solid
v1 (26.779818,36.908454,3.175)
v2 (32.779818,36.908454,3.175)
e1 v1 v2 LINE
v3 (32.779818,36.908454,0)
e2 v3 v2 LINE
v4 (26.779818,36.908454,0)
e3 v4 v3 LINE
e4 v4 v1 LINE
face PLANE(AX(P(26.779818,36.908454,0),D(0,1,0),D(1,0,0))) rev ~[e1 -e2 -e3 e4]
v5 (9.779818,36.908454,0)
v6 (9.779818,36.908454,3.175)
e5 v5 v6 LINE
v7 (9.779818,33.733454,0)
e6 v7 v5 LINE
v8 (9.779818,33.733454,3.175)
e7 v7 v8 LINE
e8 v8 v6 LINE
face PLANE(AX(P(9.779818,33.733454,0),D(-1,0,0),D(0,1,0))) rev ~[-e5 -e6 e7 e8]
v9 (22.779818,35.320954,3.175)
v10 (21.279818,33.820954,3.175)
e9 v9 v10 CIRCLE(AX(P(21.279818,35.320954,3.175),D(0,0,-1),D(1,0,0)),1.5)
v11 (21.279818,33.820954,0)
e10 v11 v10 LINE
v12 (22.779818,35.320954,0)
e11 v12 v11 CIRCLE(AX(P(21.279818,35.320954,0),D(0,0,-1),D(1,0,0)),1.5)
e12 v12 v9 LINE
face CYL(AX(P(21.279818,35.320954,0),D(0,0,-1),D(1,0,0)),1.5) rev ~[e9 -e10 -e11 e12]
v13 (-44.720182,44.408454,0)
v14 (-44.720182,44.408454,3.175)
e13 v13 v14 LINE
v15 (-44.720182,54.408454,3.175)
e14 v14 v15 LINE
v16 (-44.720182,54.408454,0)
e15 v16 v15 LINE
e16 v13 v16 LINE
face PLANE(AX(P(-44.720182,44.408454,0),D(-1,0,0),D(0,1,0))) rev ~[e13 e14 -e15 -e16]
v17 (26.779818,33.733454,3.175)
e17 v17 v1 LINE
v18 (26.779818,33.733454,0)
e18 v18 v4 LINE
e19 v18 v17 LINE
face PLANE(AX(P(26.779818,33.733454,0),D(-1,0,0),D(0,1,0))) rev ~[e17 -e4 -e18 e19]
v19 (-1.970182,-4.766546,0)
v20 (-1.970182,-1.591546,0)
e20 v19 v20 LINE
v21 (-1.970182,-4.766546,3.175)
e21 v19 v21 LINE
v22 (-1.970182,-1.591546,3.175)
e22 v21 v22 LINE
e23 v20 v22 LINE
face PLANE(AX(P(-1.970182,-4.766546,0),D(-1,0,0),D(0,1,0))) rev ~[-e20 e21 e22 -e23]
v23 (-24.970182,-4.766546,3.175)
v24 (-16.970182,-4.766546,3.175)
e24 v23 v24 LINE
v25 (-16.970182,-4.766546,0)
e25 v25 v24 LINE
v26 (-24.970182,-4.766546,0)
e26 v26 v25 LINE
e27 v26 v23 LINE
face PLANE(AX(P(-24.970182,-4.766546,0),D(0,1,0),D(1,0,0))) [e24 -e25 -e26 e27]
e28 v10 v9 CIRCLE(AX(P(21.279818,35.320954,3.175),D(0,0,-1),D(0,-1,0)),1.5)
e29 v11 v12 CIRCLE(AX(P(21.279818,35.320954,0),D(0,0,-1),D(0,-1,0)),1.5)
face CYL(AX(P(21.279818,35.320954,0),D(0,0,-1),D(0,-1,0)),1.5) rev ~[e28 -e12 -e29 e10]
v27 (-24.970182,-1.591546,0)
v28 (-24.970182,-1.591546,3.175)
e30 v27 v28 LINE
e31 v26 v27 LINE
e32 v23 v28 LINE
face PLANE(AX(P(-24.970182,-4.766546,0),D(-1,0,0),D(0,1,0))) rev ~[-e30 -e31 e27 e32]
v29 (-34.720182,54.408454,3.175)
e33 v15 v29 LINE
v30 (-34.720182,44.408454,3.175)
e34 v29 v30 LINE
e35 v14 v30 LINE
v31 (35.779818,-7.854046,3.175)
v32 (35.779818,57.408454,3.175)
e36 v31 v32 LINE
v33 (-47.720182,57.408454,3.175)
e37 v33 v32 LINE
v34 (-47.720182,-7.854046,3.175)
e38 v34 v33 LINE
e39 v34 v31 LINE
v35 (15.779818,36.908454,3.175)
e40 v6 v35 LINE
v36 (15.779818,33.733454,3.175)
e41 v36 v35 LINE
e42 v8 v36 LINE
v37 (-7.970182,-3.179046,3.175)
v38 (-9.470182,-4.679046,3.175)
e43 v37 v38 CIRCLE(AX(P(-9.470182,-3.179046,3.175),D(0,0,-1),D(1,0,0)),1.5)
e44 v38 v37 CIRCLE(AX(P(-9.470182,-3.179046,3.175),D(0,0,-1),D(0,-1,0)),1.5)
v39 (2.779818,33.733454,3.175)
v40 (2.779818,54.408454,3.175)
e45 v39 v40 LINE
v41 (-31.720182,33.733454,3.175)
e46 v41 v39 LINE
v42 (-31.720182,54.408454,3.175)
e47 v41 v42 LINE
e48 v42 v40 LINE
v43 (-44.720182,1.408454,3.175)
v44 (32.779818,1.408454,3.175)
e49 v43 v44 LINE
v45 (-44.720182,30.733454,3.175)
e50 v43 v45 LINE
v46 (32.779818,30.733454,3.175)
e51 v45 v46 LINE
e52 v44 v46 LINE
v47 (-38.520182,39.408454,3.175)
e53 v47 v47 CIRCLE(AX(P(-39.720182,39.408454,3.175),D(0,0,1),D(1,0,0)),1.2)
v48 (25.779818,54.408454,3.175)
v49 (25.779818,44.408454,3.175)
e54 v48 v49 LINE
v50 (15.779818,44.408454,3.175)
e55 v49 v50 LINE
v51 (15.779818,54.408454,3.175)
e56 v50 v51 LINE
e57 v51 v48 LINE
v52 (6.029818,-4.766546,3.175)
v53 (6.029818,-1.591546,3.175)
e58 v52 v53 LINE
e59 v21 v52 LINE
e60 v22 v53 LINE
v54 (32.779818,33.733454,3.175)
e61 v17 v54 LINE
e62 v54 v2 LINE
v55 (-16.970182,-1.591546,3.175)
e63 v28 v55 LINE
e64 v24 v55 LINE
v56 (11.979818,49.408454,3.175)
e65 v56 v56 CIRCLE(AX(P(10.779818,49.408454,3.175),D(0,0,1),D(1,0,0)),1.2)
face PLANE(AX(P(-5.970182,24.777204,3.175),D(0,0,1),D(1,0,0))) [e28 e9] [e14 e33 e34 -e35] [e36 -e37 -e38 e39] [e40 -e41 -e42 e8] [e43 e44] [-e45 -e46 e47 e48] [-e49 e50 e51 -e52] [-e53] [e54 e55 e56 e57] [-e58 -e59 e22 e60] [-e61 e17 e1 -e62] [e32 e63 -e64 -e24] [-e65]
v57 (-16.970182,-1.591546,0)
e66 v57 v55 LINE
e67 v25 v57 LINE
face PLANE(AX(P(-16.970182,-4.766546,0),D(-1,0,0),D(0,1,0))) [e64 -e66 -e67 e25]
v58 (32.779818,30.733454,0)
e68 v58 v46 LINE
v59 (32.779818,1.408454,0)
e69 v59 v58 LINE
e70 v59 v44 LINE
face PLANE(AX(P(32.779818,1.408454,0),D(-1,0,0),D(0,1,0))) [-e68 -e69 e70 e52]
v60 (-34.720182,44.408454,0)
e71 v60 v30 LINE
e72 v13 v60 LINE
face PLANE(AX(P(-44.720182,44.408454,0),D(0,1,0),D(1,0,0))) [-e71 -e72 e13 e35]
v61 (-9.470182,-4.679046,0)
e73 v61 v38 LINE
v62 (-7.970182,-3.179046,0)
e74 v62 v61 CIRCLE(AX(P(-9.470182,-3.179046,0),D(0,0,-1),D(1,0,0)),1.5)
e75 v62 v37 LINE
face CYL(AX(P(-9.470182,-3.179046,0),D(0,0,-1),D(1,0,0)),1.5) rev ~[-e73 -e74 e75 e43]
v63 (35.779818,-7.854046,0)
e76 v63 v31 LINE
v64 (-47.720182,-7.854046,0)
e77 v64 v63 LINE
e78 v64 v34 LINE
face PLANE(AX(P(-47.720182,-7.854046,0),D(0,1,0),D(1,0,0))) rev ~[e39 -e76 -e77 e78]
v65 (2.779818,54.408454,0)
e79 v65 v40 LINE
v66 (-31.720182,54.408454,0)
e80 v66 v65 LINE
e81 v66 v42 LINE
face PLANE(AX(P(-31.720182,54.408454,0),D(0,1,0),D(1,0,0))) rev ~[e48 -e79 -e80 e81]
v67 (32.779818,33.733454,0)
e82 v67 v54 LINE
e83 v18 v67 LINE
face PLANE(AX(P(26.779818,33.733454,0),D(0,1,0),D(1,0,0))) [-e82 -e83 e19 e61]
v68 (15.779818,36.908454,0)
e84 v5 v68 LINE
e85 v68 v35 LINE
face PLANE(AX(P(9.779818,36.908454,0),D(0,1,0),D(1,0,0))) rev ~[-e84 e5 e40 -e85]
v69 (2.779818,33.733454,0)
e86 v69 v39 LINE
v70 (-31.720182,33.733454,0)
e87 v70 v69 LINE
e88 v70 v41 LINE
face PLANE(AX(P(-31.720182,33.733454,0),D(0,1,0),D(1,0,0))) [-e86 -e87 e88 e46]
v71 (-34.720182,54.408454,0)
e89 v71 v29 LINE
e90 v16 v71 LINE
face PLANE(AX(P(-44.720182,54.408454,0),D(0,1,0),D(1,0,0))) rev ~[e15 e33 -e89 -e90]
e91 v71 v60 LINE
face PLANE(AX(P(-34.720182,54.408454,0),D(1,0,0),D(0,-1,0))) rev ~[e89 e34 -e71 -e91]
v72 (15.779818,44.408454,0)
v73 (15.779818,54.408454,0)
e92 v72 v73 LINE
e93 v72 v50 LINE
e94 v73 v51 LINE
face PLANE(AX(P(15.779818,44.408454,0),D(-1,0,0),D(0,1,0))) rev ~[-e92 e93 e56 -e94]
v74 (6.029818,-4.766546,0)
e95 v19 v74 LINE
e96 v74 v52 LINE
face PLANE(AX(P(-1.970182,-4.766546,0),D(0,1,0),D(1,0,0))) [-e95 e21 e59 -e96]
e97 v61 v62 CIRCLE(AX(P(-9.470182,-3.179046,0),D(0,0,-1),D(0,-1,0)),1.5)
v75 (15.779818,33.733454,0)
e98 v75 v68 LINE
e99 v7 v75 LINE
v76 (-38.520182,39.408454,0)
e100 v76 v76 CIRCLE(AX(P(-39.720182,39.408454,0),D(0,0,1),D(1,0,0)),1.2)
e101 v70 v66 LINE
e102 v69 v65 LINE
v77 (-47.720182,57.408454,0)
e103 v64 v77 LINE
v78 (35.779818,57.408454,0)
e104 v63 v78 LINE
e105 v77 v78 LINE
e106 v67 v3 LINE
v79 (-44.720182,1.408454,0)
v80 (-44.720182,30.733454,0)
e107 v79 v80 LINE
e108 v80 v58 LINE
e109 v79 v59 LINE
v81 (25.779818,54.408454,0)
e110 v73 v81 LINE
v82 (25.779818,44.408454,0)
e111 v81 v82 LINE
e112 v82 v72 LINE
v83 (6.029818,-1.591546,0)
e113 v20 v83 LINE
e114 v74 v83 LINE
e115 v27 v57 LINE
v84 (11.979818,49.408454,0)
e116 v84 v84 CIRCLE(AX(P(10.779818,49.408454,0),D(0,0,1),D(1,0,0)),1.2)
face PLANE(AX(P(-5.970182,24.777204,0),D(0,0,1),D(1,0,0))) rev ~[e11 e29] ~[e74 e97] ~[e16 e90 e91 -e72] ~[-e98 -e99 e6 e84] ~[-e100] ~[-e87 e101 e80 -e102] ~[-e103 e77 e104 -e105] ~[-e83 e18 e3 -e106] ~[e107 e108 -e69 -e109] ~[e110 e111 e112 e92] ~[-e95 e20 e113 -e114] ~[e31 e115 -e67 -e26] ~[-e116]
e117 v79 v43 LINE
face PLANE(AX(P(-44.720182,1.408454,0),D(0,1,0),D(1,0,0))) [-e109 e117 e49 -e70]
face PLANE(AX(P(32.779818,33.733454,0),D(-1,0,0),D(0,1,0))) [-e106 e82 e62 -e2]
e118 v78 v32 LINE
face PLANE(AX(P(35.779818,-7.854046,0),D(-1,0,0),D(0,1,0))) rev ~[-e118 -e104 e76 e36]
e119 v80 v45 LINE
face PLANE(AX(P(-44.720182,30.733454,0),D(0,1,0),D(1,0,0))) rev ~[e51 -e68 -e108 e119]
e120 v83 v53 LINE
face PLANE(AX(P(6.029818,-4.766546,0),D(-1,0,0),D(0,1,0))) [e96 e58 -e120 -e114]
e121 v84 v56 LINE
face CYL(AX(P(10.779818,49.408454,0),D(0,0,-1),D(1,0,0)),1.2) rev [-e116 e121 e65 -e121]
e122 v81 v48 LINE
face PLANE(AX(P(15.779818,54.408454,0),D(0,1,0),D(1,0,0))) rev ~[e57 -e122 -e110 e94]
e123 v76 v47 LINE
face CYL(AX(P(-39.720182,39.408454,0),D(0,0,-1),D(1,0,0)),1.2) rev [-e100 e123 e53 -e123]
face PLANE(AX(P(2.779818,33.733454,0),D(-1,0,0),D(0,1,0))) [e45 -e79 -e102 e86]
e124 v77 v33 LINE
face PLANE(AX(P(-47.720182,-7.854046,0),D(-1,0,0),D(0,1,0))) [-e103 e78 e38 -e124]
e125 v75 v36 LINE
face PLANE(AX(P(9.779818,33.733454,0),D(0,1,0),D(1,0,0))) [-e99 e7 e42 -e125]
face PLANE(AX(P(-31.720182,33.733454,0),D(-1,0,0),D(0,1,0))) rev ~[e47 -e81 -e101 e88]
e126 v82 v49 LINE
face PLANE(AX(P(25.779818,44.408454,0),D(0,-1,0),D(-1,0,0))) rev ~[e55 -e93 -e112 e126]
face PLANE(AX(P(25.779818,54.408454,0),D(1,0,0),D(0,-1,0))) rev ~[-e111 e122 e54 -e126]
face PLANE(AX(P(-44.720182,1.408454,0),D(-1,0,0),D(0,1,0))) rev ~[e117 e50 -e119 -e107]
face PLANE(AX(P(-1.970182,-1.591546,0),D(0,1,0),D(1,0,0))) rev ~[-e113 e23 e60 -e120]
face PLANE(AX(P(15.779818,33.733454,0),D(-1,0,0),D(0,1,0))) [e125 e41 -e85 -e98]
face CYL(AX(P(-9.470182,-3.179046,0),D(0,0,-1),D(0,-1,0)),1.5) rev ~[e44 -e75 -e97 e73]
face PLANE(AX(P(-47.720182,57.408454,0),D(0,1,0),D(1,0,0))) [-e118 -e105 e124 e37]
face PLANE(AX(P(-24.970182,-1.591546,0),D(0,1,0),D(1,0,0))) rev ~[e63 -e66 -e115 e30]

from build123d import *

# Parameters (mm, degrees)
F0_W     = 83.5
F0_H     = 65.2625
F0_W_2   = 8
F0_H_2   = 3.175
F0_W_3   = 77.5
F0_H_3   = 29.325
F0_W_4   = 34.5
F0_H_4   = 20.675
F0_W_5   = 6
F0_W_6   = 10
F0_H_5   = 10
F0_R     = 1.2
F1_DEPTH = 3.175


# Not quite as in the source:
# - a length typed as a fraction of an inch, garbled in the dataset ("3 / 203.2 mm" for 3/8 in), is restored
# - a feature names something its author has since deleted; it is built from what else it names


with BuildPart() as f1:
    # F0 (on Top) → F1 (new body)
    with BuildSketch(Plane.XY):
        with Locations((-5.970182175, 24.7772044539)):
            Rectangle(F0_W, F0_H)
        with Locations((-20.970182175, -3.1790455461)):
            Rectangle(F0_W_2, F0_H_2, mode=Mode.SUBTRACT)
        with BuildLine():
            ThreePointArc((-9.470182175, -4.6790455461), (-10.5308423468, -2.1183853743), (-7.970182175, -3.1790455461))
            ThreePointArc((-7.970182175, -3.1790455461), (-8.4095220032, -4.2397057179), (-9.470182175, -4.6790455461))
        make_face(mode=Mode.SUBTRACT)
        with Locations((2.029817825, -3.1790455461)):
            Rectangle(F0_W_2, F0_H_2, mode=Mode.SUBTRACT)
        with Locations((-5.970182175, 16.0709544539)):
            Rectangle(F0_W_3, F0_H_3, mode=Mode.SUBTRACT)
        Polygon((-44.720182175, 34.4084544539), (-44.720182175, 44.4084544539), (-44.720182175, 54.4084544539), (-34.720182175, 54.4084544539), (-34.720182175, 44.4084544539), (-34.720182175, 34.4084544539), align=None, mode=Mode.SUBTRACT)
        with Locations((-14.470182175, 44.0709544539)):
            Rectangle(F0_W_4, F0_H_4, mode=Mode.SUBTRACT)
        with Locations((12.779817825, 35.3209544539)):
            Rectangle(F0_W_5, F0_H_2, mode=Mode.SUBTRACT)
        with BuildLine():
            ThreePointArc((21.279817825, 33.8209544539), (20.2191576532, 36.3816146257), (22.779817825, 35.3209544539))
            ThreePointArc((22.779817825, 35.3209544539), (22.3404779968, 34.2602942821), (21.279817825, 33.8209544539))
        make_face(mode=Mode.SUBTRACT)
        with Locations((29.779817825, 35.3209544539)):
            Rectangle(F0_W_5, F0_H_2, mode=Mode.SUBTRACT)
        Polygon((25.779817825, 44.4084544539), (15.779817825, 44.4084544539), (5.779817825, 44.4084544539), (5.779817825, 54.4084544539), (15.779817825, 54.4084544539), (25.779817825, 54.4084544539), align=None, mode=Mode.SUBTRACT)
        with Locations((-39.720182175, 39.4084544539)):
            Rectangle(F0_W_6, F0_H_5)
        with Locations((-39.720182175, 39.4084544539)):
            Circle(F0_R, mode=Mode.SUBTRACT)
        with Locations((10.779817825, 49.4084544539)):
            Rectangle(F0_W_6, F0_H_5)
        with Locations((10.779817825, 49.4084544539)):
            Circle(F0_R, mode=Mode.SUBTRACT)
    extrude(amount=F1_DEPTH)


solid = f1.part
